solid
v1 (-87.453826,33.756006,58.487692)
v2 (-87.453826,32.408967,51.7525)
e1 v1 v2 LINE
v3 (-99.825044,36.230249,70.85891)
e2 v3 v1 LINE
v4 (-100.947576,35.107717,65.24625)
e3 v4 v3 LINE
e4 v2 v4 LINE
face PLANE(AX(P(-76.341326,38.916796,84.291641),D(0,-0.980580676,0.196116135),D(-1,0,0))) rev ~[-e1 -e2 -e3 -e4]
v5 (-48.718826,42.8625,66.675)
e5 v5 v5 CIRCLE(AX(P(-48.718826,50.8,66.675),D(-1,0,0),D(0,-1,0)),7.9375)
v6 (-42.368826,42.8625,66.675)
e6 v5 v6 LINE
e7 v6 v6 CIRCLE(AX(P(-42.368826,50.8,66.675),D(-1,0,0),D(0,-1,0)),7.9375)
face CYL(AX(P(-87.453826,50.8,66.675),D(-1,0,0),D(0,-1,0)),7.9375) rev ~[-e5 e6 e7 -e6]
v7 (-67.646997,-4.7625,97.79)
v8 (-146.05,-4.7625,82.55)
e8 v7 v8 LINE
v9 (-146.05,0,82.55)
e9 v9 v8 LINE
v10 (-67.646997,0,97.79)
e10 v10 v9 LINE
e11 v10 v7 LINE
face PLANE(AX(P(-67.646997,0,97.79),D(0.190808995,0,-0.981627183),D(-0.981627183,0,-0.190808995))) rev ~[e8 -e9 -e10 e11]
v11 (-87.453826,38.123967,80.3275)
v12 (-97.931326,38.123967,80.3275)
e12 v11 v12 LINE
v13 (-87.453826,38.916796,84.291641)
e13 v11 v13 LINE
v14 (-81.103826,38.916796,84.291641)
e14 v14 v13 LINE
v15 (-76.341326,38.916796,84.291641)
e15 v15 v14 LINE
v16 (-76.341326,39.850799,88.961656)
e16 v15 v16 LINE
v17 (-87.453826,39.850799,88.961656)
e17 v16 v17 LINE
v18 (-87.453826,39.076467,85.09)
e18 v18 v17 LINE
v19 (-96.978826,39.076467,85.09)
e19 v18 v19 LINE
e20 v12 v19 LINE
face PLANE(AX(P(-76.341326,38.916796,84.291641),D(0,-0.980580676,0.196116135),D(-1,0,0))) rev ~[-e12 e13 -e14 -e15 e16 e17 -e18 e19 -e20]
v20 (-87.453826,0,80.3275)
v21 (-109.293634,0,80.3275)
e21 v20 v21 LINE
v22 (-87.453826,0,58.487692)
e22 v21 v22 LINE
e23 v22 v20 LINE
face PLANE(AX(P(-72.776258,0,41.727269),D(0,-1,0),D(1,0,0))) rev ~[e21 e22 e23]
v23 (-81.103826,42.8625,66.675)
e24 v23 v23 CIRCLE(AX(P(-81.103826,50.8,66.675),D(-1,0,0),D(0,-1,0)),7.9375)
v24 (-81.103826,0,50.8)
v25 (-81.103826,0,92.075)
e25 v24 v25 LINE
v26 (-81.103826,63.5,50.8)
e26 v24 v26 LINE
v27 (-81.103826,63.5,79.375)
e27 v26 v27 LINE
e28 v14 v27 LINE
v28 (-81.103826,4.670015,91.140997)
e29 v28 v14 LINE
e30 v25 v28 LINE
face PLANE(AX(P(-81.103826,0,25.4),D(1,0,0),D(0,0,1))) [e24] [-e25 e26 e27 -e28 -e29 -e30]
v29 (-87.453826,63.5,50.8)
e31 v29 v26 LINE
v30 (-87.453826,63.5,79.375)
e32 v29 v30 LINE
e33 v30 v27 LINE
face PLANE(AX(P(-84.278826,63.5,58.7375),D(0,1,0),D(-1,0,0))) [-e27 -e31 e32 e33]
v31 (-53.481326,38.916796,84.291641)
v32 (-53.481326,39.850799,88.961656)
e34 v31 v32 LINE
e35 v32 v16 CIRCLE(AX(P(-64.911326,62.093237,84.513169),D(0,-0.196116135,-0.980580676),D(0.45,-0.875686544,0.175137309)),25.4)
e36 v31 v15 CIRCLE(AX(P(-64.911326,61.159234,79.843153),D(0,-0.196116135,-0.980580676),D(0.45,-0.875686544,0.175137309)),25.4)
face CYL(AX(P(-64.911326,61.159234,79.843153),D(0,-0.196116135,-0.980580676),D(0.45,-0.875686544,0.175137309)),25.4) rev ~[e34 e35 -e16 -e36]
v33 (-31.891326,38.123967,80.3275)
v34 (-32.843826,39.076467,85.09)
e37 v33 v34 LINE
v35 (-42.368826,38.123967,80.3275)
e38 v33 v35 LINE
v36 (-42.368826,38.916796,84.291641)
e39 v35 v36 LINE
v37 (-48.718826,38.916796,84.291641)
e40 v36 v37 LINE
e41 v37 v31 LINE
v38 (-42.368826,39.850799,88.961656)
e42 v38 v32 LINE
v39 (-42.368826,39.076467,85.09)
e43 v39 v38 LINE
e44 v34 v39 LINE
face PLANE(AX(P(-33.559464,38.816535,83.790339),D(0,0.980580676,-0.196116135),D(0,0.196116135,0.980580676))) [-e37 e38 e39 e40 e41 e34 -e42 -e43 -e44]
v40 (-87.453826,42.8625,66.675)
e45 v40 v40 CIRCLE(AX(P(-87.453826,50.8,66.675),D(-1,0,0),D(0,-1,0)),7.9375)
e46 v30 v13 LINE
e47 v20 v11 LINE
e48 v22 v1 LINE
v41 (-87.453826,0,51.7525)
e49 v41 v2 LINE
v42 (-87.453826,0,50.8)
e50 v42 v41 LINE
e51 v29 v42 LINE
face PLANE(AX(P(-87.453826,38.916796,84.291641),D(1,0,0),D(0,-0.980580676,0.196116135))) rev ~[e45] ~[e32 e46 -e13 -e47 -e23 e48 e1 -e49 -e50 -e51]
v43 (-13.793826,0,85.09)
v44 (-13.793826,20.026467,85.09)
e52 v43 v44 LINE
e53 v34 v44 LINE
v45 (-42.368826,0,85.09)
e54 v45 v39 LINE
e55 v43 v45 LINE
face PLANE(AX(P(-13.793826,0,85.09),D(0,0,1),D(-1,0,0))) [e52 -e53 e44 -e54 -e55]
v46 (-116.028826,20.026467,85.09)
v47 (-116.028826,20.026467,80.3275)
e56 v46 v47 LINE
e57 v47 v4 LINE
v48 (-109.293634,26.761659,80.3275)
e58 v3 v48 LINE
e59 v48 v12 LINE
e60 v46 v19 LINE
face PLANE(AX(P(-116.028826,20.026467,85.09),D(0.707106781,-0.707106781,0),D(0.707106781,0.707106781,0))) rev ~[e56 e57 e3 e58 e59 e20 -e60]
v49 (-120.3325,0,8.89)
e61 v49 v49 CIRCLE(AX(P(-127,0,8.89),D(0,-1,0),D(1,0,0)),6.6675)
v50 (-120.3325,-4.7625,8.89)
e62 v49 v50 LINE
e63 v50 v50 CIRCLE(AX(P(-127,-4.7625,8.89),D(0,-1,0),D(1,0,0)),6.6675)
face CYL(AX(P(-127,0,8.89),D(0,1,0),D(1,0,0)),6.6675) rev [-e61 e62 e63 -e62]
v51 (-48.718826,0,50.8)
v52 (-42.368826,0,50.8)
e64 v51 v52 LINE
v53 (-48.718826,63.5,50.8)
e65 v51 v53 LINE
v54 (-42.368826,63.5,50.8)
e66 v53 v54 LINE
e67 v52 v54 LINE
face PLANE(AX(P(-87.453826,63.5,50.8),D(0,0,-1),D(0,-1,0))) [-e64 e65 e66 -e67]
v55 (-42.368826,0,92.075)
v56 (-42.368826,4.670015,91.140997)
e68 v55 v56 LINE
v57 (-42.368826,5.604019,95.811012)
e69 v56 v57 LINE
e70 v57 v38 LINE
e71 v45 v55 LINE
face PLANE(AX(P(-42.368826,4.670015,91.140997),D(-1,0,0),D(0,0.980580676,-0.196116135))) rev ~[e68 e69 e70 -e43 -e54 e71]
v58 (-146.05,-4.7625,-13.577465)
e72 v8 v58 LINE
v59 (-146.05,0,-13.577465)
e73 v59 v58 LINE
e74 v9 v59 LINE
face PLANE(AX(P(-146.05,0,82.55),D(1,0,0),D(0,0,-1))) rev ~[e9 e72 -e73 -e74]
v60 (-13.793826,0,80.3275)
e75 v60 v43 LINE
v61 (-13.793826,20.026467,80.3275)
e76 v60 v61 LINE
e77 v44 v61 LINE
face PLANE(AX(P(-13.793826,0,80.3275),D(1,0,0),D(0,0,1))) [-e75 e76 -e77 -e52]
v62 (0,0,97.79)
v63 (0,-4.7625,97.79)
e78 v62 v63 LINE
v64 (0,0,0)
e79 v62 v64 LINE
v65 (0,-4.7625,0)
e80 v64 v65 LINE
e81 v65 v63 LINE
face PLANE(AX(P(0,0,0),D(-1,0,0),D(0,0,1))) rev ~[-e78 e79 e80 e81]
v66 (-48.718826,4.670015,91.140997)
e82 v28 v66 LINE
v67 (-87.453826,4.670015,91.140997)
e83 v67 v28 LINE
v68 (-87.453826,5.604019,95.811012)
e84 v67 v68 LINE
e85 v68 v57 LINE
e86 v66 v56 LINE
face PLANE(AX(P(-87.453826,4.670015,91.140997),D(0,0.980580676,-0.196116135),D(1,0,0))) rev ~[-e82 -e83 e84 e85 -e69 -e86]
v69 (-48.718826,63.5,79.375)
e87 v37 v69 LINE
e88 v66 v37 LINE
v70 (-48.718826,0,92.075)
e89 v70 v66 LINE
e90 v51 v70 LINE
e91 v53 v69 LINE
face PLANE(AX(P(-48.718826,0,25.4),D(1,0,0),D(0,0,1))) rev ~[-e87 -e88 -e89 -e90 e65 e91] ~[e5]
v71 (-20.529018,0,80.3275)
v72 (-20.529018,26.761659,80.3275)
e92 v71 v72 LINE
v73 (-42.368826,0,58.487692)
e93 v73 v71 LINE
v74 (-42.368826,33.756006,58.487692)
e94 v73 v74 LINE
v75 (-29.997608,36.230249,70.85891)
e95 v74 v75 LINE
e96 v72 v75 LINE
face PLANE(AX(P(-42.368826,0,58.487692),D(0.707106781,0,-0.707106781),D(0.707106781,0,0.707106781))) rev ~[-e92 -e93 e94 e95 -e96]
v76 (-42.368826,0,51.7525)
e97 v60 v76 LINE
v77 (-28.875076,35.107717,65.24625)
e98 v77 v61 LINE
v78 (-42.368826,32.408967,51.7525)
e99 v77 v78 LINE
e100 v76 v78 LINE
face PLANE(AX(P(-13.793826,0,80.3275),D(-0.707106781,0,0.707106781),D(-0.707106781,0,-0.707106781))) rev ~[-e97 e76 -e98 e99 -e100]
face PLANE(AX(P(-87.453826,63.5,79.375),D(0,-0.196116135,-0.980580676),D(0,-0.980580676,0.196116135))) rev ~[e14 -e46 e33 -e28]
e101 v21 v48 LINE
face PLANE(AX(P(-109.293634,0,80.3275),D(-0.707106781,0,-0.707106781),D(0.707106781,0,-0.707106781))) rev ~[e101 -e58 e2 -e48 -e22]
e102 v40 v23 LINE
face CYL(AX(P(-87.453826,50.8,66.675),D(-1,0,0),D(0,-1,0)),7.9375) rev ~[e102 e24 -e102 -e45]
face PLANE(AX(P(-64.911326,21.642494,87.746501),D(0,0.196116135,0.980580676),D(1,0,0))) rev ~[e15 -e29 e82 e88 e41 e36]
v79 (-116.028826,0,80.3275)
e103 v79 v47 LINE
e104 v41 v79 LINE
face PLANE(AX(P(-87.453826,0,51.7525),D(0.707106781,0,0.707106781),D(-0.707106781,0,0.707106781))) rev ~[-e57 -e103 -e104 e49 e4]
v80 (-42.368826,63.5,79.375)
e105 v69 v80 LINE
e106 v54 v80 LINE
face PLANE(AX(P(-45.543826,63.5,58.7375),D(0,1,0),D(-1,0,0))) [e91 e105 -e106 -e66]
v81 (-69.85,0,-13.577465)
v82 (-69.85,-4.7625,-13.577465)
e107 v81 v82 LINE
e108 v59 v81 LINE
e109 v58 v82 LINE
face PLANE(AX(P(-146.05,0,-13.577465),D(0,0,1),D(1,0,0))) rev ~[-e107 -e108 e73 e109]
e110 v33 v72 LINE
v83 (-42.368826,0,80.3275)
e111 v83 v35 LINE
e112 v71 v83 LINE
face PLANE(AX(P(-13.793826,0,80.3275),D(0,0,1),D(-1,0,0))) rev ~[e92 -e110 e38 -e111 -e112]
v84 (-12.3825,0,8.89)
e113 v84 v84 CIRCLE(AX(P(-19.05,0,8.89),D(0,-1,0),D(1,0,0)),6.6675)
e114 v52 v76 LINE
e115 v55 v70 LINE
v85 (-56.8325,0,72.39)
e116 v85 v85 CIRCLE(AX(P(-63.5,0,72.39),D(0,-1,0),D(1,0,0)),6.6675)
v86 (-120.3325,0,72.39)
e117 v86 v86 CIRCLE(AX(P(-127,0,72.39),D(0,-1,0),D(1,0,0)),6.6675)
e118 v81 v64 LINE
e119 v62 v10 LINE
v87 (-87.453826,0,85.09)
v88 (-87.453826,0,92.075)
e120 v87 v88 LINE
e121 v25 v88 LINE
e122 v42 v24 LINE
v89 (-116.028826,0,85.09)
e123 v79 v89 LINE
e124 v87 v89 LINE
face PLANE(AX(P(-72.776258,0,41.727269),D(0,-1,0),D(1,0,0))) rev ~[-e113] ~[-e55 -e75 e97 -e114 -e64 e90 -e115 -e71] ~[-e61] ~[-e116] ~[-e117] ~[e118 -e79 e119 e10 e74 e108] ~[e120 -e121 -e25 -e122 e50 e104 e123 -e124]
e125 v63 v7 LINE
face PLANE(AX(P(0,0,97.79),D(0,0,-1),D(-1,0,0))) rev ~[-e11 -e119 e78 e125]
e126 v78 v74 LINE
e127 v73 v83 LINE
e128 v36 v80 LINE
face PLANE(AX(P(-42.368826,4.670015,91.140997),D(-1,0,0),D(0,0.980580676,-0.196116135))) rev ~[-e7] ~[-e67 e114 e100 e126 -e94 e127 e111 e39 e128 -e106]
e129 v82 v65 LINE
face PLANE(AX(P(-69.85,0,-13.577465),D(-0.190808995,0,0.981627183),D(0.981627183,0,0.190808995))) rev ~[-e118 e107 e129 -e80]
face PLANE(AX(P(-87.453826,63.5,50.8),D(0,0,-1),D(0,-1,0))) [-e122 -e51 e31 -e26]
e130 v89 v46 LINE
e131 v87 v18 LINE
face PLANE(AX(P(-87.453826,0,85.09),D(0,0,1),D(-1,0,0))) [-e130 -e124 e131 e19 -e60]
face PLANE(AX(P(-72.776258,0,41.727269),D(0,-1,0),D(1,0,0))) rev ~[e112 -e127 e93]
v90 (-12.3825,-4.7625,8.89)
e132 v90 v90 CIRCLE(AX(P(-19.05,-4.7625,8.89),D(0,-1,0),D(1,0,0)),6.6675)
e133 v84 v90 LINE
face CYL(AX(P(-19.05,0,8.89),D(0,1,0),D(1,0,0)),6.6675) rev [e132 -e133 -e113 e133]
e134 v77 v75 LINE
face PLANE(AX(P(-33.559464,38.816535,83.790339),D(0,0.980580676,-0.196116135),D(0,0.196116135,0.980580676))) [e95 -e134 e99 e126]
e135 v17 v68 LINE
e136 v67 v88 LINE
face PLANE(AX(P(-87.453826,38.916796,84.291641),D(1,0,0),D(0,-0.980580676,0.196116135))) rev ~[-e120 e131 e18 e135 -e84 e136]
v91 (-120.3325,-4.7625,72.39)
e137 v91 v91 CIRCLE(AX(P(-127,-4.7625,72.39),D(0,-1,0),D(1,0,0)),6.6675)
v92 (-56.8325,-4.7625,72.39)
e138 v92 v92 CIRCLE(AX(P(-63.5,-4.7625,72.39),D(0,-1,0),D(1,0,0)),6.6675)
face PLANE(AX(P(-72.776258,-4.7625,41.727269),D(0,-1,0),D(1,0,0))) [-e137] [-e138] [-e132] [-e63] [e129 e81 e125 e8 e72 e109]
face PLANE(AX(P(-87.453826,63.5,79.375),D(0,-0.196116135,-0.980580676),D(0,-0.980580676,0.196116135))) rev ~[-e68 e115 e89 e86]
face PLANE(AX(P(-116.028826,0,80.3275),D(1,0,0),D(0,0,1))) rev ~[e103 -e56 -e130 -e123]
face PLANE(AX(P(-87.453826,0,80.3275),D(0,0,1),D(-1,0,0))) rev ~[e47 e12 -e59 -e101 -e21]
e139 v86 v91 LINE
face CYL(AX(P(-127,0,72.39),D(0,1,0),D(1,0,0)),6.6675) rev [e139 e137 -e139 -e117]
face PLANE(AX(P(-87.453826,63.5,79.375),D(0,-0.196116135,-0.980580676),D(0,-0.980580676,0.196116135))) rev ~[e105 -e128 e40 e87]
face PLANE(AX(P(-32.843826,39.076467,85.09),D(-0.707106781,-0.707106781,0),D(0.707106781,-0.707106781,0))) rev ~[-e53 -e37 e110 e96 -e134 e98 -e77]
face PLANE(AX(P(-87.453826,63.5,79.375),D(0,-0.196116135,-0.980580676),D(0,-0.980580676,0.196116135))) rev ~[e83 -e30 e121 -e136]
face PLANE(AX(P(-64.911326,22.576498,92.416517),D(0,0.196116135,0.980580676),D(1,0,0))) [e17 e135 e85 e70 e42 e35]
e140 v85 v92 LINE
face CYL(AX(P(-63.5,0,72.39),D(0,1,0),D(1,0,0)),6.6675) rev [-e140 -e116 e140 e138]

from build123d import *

# Parameters (mm, degrees)
F0_R      = 6.6675
F1_DEPTH  = 4.7625
F2_W      = 6.35
F2_H      = 66.675
F3_DEPTH  = 63.5
F4_R      = 7.9375
F4_W      = 63.5
F4_H      = 25.4
F5_DEPTH  = 87.4548256
F7_DEPTH  = 4.7625
F8_W      = 28.575
F8_H      = 4.7625
F9_REACH  = 92.4701565505
F11_REACH = 103.9121525448
F13_DEPTH = 98.6684645933


with BuildPart() as f1:
    # F0 (on Front) → F1 (new body)
    with BuildSketch(Plane.XZ):
        Polygon((-67.6469967966, 97.79), (-146.05, 82.55), (-146.05, -13.5774645933), (-69.85, -13.5774645933), (0, 0), (0, 97.79), align=None)
        with Locations((-127, 8.89)):
            Circle(F0_R, mode=Mode.SUBTRACT)
        with Locations((-19.05, 8.89)):
            Circle(F0_R, mode=Mode.SUBTRACT)
        with Locations((-127, 72.39)):
            Circle(F0_R, mode=Mode.SUBTRACT)
        with Locations((-63.5, 72.39)):
            Circle(F0_R, mode=Mode.SUBTRACT)
    extrude(amount=F1_DEPTH)

    # F2 (on face) → F3 (join)
    with BuildSketch(Plane(origin=(0, 0, 0), x_dir=(-1, 0, 0), z_dir=(0, 1, 0))):
        with Locations((45.5438256, 58.7375)):
            Rectangle(F2_W, F2_H)
        with Locations((84.2788256, 58.7375)):
            Rectangle(F2_W, F2_H)
    extrude(amount=F3_DEPTH)

    # F4 (on face) → F5 (cut, through all)
    with BuildSketch(Plane(origin=(-87.4538256, 0, 0), x_dir=(0, -1, 0), z_dir=(-1, 0, 0))):
        Polygon((-63.5, 79.375), (0, 92.075), (-63.5, 92.075), align=None)
        with Locations((-50.8, 66.675)):
            Circle(F4_R)
        with Locations((-31.75, 38.1)):
            Rectangle(F4_W, F4_H)
    extrude(amount=-F5_DEPTH, mode=Mode.SUBTRACT)

    # F6 (on face) → F7 (join)
    with BuildSketch(Plane(origin=(0, 17.7067307692, 88.5336538462), x_dir=(1, 0, 0), z_dir=(0, 0.1961161351, 0.9805806757))):
        with BuildLine():
            Line((-87.4538256, -13.2948931428), (-42.3688256, -13.2948931428))
            Line((-42.3688256, -13.2948931428), (-42.3688256, 21.6301068572))
            Line((-42.3688256, 21.6301068572), (-53.4813256, 21.6301068572))
            ThreePointArc((-53.4813256, 21.6301068572), (-64.9113256, 18.9130321535), (-76.3413256, 21.6301068572))
            Line((-76.3413256, 21.6301068572), (-87.4538256, 21.6301068572))
            Line((-87.4538256, 21.6301068572), (-87.4538256, -13.2948931428))
        make_face()
    extrude(amount=F7_DEPTH)

    f9_end = Plane(origin=(-47.9250756, 39.3837971133, 86.6266486207), x_dir=(0, 0.1961161351, 0.9805806757), z_dir=(0, 0.9805806757, -0.1961161351))
    # F8 (on face) → F9 (join, up to a plane its end follows)
    with BuildSketch(Plane(origin=(0, 0, 0), x_dir=(-1, 0, 0), z_dir=(0, 1, 0))):
        with Locations((28.0813256, 82.70875)):
            Rectangle(F8_W, F8_H)
        with Locations((101.7413256, 82.70875)):
            Rectangle(F8_W, F8_H)
    f9_long = extrude(amount=F9_REACH, mode=Mode.PRIVATE)
    add(split(f9_long, bisect_by=f9_end, keep=Keep.BOTTOM, mode=Mode.PRIVATE))

    f11_end = Plane(origin=(-33.5594638675, 38.8165352763, 83.7903394356), x_dir=(0, 0.1961161351, 0.9805806757), z_dir=(0, 0.9805806757, -0.1961161351))
    # F10 (on face) → F11 (join, up to a plane its end follows)
    with BuildSketch(Plane(origin=(0, 0, 0), x_dir=(-1, 0, 0), z_dir=(0, 1, 0))):
        Polygon((20.5290176908, 80.3275), (13.7938256, 80.3275), (42.3688256, 51.7525), (42.3688256, 58.4876920908), align=None)
        Polygon((116.0288256, 80.3275), (109.2936335092, 80.3275), (87.4538256, 58.4876920908), (87.4538256, 51.7525), align=None)
    f11_long = extrude(amount=F11_REACH, mode=Mode.PRIVATE)
    add(split(f11_long, bisect_by=f11_end, keep=Keep.BOTTOM, mode=Mode.PRIVATE))

    # F12 (on face) → F13 (cut, through all)
    with BuildSketch(Plane.XY.offset(85.09)):
        Polygon((-13.7938256, 39.0764673892), (-32.8438256, 39.0764673892), (-13.7938256, 20.0264673892), align=None)
        Polygon((-116.0288256, 20.0264673892), (-96.9788256, 39.0764673892), (-116.0288256, 39.0764673892), align=None)
    extrude(amount=-F13_DEPTH, mode=Mode.SUBTRACT)


solid = f1.part
